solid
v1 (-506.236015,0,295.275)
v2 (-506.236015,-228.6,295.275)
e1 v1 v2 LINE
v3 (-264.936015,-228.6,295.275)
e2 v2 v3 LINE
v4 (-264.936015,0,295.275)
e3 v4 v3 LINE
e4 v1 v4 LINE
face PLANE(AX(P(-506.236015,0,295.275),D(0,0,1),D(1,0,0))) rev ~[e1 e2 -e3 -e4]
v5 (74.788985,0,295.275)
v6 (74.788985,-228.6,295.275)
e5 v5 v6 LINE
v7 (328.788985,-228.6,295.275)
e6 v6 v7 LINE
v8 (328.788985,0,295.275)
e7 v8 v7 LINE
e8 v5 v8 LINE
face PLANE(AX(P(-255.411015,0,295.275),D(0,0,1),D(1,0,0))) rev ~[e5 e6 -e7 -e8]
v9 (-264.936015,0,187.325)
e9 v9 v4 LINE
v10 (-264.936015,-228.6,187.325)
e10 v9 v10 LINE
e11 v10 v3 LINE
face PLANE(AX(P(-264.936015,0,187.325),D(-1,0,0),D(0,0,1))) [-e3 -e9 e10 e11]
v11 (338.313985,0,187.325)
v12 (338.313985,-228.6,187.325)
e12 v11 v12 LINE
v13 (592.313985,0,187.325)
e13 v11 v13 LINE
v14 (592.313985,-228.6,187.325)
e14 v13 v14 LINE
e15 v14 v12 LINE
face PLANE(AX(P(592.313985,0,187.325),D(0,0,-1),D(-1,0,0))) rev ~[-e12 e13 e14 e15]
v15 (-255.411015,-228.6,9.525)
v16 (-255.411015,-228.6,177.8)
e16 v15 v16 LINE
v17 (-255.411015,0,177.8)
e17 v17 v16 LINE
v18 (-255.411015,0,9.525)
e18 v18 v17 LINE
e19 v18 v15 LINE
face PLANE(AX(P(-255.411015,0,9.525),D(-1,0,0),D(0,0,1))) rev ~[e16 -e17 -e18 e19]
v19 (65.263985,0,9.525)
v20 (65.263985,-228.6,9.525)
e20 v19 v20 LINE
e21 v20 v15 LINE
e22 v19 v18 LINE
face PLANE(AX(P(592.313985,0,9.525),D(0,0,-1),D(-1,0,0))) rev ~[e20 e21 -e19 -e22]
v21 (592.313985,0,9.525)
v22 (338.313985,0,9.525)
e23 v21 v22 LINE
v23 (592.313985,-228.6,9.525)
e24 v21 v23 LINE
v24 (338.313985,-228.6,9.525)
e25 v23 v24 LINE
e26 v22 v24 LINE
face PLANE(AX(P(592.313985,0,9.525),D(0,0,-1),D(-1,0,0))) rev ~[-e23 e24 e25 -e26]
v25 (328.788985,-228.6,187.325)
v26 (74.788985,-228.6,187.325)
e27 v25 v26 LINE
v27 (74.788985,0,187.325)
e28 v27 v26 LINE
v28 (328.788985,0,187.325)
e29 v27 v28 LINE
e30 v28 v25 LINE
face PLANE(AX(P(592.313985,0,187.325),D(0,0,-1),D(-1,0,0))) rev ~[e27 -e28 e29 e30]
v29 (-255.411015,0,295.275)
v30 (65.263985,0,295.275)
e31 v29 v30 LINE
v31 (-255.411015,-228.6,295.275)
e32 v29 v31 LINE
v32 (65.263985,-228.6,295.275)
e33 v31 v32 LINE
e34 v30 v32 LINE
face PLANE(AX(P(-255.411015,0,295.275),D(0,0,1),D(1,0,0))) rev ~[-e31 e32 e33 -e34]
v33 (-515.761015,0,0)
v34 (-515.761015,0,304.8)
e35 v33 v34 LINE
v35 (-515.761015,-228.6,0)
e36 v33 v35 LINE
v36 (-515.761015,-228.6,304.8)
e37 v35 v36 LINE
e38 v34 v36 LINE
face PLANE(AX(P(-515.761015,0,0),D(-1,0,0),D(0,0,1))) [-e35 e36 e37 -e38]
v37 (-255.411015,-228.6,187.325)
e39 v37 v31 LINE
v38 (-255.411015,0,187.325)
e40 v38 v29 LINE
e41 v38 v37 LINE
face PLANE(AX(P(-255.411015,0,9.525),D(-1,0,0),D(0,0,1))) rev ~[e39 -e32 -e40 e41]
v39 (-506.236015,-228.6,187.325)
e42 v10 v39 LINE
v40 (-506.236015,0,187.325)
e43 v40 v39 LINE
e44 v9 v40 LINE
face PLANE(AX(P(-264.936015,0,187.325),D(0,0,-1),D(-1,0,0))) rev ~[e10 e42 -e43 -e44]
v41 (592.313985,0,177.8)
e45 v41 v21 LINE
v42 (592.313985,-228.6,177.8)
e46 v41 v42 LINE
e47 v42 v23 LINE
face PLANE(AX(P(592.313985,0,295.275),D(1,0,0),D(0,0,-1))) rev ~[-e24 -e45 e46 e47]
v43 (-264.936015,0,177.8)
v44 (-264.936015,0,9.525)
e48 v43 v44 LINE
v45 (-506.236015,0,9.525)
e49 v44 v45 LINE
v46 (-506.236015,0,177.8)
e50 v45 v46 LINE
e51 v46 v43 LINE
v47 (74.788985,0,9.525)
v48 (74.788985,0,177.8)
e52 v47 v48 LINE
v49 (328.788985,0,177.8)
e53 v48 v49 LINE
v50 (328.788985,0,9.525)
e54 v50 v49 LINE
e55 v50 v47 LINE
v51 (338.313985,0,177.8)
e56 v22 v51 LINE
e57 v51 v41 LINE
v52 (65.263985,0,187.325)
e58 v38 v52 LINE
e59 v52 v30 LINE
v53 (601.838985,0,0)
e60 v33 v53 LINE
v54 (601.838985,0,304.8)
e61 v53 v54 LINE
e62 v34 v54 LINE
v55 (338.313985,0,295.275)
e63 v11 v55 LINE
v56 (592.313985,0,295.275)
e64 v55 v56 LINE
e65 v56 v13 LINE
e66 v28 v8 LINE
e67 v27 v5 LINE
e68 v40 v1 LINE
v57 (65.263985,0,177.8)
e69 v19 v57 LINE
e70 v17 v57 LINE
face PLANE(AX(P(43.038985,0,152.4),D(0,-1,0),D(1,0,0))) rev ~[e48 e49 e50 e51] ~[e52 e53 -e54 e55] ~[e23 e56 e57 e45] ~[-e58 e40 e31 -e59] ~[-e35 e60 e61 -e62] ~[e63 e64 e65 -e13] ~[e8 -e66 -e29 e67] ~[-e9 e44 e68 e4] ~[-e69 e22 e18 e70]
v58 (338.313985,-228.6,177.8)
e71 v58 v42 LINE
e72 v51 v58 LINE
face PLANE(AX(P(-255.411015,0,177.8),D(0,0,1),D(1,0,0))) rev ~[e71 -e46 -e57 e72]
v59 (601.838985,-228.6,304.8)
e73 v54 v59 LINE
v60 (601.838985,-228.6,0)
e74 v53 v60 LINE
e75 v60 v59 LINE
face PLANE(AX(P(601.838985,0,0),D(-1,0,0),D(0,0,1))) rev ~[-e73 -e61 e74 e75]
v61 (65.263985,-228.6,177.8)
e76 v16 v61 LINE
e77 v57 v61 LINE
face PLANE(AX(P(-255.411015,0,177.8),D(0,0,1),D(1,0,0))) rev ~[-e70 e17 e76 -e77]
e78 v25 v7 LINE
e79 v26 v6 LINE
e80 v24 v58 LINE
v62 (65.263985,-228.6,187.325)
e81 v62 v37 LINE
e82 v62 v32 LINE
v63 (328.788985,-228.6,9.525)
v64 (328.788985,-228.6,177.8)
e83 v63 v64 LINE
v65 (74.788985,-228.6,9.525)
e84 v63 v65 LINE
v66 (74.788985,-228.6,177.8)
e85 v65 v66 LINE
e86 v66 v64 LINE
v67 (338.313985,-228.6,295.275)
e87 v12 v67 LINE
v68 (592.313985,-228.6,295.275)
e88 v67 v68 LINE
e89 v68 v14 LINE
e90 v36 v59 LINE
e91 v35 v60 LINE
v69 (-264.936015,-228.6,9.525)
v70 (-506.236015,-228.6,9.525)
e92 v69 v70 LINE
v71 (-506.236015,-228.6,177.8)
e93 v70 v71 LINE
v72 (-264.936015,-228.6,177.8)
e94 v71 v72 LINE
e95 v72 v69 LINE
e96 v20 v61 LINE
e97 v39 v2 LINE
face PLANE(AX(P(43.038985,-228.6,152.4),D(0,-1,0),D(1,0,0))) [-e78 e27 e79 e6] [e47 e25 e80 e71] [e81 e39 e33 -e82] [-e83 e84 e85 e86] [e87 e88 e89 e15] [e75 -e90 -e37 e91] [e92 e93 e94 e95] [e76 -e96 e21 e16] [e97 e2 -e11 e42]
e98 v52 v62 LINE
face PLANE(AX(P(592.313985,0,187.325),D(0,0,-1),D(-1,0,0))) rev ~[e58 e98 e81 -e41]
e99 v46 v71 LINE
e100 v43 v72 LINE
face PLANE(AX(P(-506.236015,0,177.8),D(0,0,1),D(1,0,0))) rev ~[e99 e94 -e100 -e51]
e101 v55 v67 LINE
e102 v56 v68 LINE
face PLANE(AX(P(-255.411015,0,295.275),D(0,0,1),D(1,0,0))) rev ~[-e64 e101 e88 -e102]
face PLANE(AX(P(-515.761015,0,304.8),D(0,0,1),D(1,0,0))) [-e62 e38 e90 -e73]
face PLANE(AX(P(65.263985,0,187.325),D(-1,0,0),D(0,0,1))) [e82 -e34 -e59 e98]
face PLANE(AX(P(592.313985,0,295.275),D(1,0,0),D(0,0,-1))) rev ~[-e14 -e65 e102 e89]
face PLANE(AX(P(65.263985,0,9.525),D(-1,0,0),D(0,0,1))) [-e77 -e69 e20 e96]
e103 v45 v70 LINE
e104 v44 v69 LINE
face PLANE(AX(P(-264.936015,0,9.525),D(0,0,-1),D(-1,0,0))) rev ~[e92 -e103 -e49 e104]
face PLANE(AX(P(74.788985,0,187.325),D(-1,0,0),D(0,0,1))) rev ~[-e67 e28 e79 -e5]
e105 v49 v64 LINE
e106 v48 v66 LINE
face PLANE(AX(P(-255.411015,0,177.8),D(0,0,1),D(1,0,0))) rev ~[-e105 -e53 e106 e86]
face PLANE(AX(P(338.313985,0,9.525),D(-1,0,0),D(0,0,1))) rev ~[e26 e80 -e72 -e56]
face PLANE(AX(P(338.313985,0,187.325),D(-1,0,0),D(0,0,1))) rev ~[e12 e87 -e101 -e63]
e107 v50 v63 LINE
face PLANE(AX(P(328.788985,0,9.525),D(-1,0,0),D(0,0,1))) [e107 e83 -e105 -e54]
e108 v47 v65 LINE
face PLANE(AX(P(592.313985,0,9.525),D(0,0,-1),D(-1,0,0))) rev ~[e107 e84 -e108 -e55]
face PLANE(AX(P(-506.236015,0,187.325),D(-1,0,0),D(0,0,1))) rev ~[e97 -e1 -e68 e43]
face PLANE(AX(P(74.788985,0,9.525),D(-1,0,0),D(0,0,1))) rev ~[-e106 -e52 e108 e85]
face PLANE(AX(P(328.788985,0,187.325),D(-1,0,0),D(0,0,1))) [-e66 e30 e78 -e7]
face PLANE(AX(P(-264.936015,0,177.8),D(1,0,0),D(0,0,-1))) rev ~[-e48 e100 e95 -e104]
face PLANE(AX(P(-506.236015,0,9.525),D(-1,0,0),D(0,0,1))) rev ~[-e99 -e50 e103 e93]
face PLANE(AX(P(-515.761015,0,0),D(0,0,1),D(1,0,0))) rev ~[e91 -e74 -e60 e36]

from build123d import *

# Parameters (mm, degrees)
F0_W     = 1117.6
F0_H     = 304.8
F0_W_2   = 9.525
F0_H_2   = 107.95
F1_DEPTH = 228.6
F0_W_3   = 320.675
F0_H_3   = 9.525
F0_W_4   = 254
F2_DEPTH = 228.6
F0_H_4   = 168.275
F3_DEPTH = 228.6
F4_DEPTH = 228.6
F5_DEPTH = 228.6


with BuildPart() as f1:
    # F0 (on Front) → F1 (new body)
    with BuildSketch(Plane.XZ):
        with Locations((43.0389853762, 152.4)):
            Rectangle(F0_W, F0_H)
        Polygon((-264.9360146238, 9.525), (-506.2360146238, 9.525), (-506.2360146238, 177.8), (-506.2360146238, 187.325), (-506.2360146238, 295.275), (-264.9360146238, 295.275), (-255.4110146238, 295.275), (65.2639853762, 295.275), (74.7889853762, 295.275), (328.7889853762, 295.275), (338.3139853762, 295.275), (592.3139853762, 295.275), (592.3139853762, 187.325), (592.3139853762, 177.8), (592.3139853762, 9.525), (338.3139853762, 9.525), (328.7889853762, 9.525), (74.7889853762, 9.525), (65.2639853762, 9.525), (-255.4110146238, 9.525), align=None, mode=Mode.SUBTRACT)
        Polygon((-506.2360146238, 187.325), (-506.2360146238, 177.8), (-264.9360146238, 177.8), (-264.9360146238, 9.525), (-255.4110146238, 9.525), (-255.4110146238, 177.8), (-255.4110146238, 187.325), (-264.9360146238, 187.325), align=None)
        with Locations((-260.1735146238, 241.3)):
            Rectangle(F0_W_2, F0_H_2)
    extrude(amount=F1_DEPTH)

    # F0 (on Front) → F2 (join, through all)
    with BuildSketch(Plane.XZ):
        with Locations((-95.0735146238, 182.5625)):
            Rectangle(F0_W_3, F0_H_3)
        with Locations((70.0264853762, 182.5625)):
            Rectangle(F0_W_2, F0_H_3)
        with Locations((201.7889853762, 182.5625)):
            Rectangle(F0_W_4, F0_H_3)
        with Locations((333.5514853762, 182.5625)):
            Rectangle(F0_W_2, F0_H_3)
        with Locations((465.3139853762, 182.5625)):
            Rectangle(F0_W_4, F0_H_3)
    extrude(amount=F2_DEPTH)

    # F0 (on Front) → F3 (join, through all)
    with BuildSketch(Plane.XZ):
        with Locations((333.5514853762, 93.6625)):
            Rectangle(F0_W_2, F0_H_4)
    extrude(amount=F3_DEPTH)

    # F0 (on Front) → F4 (join, through all)
    with BuildSketch(Plane.XZ):
        with Locations((-95.0735146238, 182.5625)):
            Rectangle(F0_W_3, F0_H_3)
        with Locations((70.0264853762, 93.6625)):
            Rectangle(F0_W_2, F0_H_4)
    extrude(amount=F4_DEPTH)

    # F0 (on Front) → F5 (join, through all)
    with BuildSketch(Plane.XZ):
        with Locations((70.0264853762, 241.3)):
            Rectangle(F0_W_2, F0_H_2)
        with Locations((333.5514853762, 241.3)):
            Rectangle(F0_W_2, F0_H_2)
    extrude(amount=F5_DEPTH)


solid = f1.part
